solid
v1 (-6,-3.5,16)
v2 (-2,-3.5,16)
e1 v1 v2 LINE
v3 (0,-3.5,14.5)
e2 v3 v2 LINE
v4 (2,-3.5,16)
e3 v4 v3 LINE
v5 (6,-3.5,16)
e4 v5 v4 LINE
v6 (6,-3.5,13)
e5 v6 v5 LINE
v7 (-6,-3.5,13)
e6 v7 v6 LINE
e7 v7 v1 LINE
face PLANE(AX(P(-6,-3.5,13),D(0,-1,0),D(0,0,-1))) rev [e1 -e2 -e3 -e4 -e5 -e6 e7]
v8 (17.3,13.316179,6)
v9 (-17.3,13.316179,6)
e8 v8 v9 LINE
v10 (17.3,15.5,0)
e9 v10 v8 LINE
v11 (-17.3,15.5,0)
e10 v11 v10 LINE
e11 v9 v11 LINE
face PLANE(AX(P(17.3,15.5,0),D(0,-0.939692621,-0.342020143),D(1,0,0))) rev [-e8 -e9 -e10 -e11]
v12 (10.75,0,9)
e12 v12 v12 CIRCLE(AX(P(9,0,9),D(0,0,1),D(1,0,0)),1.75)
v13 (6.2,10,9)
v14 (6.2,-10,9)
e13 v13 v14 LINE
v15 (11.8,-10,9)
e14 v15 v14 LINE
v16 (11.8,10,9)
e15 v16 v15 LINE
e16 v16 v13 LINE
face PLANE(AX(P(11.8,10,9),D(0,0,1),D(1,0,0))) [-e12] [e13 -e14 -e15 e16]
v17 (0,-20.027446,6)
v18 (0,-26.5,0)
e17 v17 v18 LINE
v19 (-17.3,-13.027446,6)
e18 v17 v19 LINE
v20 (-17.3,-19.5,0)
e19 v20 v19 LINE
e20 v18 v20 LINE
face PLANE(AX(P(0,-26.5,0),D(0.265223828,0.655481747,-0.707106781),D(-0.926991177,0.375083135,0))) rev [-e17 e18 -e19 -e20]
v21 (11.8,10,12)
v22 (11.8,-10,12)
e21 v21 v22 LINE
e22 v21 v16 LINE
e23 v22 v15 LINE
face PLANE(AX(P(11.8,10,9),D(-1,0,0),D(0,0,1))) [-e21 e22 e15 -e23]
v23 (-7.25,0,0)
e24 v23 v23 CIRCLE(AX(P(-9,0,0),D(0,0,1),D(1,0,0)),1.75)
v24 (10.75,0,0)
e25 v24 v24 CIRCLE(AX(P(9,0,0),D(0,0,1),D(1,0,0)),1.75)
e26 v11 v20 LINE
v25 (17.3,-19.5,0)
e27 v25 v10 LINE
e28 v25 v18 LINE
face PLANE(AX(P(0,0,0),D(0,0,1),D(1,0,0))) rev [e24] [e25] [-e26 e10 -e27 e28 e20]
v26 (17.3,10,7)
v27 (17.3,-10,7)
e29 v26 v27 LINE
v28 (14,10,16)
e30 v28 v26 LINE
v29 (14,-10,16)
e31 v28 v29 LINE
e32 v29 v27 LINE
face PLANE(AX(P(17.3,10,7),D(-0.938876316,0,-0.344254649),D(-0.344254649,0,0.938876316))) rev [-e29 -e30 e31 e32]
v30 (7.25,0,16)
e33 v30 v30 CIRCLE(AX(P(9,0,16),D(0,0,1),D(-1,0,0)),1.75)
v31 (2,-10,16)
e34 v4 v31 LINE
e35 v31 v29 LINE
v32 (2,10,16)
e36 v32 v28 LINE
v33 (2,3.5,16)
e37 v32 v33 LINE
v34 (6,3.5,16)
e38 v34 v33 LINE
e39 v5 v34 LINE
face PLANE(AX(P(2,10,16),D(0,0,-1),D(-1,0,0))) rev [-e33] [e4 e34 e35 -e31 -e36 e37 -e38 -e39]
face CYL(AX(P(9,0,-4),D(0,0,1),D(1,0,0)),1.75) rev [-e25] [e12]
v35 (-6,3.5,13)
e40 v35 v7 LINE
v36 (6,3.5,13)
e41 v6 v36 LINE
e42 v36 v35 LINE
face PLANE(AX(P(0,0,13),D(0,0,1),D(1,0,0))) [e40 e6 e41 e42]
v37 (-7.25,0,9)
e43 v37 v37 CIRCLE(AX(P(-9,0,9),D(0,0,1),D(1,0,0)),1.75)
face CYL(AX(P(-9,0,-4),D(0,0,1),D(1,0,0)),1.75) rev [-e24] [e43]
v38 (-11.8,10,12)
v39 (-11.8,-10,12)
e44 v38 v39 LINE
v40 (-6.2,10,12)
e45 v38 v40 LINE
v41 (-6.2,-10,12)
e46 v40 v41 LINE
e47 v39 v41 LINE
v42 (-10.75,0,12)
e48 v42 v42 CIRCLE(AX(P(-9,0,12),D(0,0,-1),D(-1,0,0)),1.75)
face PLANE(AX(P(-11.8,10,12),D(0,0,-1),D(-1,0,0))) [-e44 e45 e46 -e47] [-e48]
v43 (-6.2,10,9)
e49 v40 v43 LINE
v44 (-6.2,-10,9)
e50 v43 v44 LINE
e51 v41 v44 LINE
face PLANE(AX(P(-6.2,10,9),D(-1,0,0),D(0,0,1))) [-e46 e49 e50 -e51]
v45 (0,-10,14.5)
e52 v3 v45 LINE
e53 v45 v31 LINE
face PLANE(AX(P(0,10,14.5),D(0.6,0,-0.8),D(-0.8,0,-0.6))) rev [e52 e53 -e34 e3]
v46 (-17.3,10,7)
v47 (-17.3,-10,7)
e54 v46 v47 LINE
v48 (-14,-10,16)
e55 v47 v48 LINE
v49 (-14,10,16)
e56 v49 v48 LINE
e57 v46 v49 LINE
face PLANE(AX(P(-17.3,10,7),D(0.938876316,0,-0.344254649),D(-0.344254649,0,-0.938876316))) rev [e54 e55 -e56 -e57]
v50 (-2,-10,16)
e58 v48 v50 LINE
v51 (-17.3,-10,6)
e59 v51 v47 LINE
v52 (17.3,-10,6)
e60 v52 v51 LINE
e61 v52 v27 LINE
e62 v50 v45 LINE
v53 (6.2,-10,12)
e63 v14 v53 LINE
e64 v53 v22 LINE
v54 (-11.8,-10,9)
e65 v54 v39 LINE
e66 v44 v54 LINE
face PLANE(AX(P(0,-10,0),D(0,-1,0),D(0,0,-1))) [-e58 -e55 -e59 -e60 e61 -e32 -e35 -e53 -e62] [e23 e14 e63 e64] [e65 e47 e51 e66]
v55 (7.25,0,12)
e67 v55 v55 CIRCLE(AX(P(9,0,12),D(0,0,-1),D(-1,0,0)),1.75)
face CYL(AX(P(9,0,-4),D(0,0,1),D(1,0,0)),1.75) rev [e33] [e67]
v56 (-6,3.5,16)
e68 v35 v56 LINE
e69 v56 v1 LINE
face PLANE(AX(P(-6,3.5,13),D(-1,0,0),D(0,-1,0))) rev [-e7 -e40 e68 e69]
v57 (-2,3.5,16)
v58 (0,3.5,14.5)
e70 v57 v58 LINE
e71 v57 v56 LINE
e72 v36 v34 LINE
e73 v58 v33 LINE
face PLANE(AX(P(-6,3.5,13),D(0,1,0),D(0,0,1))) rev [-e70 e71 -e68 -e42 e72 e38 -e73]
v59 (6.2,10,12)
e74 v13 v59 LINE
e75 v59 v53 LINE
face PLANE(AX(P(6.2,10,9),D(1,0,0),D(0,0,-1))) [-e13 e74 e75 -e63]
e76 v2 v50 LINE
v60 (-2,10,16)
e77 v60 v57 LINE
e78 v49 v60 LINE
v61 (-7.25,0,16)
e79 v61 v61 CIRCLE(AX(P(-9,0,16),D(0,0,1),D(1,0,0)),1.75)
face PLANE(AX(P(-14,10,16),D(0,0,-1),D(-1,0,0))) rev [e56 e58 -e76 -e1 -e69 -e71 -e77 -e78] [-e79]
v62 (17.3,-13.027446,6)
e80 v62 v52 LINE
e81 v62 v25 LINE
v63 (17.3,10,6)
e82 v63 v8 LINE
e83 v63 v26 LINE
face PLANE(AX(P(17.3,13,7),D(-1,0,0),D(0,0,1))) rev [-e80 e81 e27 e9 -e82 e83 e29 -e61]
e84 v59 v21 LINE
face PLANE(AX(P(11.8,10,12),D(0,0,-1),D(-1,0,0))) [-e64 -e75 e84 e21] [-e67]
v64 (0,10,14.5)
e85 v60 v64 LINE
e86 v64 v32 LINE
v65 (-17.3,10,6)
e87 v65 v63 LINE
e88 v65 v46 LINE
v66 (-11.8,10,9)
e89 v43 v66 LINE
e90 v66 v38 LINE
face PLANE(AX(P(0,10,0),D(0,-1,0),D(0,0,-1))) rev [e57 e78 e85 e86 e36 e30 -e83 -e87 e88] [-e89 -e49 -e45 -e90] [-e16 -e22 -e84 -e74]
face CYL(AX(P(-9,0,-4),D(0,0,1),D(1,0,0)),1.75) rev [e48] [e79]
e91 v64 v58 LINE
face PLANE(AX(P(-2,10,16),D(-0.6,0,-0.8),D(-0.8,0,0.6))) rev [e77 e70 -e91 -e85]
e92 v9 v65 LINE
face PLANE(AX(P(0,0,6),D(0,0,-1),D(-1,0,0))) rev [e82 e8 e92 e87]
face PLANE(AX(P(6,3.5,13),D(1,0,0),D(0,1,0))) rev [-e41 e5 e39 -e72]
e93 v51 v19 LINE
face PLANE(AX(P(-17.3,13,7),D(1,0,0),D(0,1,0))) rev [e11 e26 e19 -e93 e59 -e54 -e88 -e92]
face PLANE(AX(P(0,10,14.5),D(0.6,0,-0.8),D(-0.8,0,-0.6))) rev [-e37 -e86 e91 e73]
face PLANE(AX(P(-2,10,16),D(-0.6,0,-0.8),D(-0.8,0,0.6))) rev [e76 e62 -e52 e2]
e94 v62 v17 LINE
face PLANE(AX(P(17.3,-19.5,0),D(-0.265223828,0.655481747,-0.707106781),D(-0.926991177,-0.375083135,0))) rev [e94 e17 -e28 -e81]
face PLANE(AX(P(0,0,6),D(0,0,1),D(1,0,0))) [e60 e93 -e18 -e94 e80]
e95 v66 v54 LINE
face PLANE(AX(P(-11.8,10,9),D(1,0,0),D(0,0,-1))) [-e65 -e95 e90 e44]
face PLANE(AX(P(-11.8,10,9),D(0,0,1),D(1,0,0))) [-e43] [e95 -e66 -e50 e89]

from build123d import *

# Parameters (mm, degrees)
ESBO_O1_W                = 34.6
ESBO_O1_H                = 26
RESSALTO_EXTRUS_O1_DEPTH = 7
ESBO_O10_W               = 34.6
ESBO_O10_H               = 2.5
RESSALTO_EXTRUS_O4_DEPTH = 7
CHANFRO1_SIZE            = 7
CHANFRO2_SIZE2           = 7
CHANFRO2_SIZE            = 2.54779164
ESBO_O11_W               = 5.6
ESBO_O11_H               = 3
RESSALTO_EXTRUS_O5_DEPTH = 10
ESBO_O12_R               = 1.75
CORTE_EXTRUS_O1_DEPTH    = 20
ESBO_O13_W               = 34.6
ESBO_O13_H               = 5.5
ESBO_O13_H_2             = 18.393079324
CORTE_EXTRUS_O2_DEPTH    = 1
ESBO_O14_W               = 12
ESBO_O14_H               = 7
CORTE_EXTRUS_O3_DEPTH    = 3


with BuildPart() as part:
    # Esboço1 → Ressalto-extrusão1 (new body)
    with BuildSketch(Plane.XY):
        Rectangle(ESBO_O1_W, ESBO_O1_H)
    extrude(amount=RESSALTO_EXTRUS_O1_DEPTH)

    # Esboço10 → Ressalto-extrusão4 (add)
    with BuildSketch(Plane(origin=(0, 0, 0), x_dir=(-1, 0, 0), z_dir=(0, 0, -1))):
        Polygon((-17.3, -19.5), (0, -26.5), (17.3, -19.5), (17.3, -13), (-17.3, -13), align=None)
        with Locations((0, 14.25)):
            Rectangle(ESBO_O10_W, ESBO_O10_H)
    extrude(amount=-RESSALTO_EXTRUS_O4_DEPTH)

    # Chanfro1
    chanfro1_edges = [part.edges().sort_by_distance(p)[0] for p in [
        (8.65, -23, 7),
        (-8.65, -23, 7),
    ]]
    chamfer(chanfro1_edges, length=CHANFRO1_SIZE - 0.0001)  # a hair under: the kernel refuses the full size

    # Chanfro2
    chanfro2_edges = [part.edges().sort_by_distance(p)[0] for p in [
        (0, 15.5, 7),
    ]]
    chanfro2_side = [part.faces().sort_by_distance(p)[0] for p in [
        (0, 15.449044167, 7),
    ]]
    chamfer(chanfro2_edges, length=CHANFRO2_SIZE - 0.0001, length2=CHANFRO2_SIZE2 - 0.0001, reference=chanfro2_side[0])  # a hair under: the kernel refuses the full size

    # Esboço11 → Ressalto-extrusão5 (add, symmetric)
    with BuildSketch(Plane(origin=(0, 0, 0), x_dir=(1, 0, 0), z_dir=(0, 1, 0))):
        Polygon((-17.3, -7), (-14, -16), (-2, -16), (0, -14.5), (2, -16), (14, -16), (17.3, -7), align=None)
        with Locations((-9, -10.5)):
            Rectangle(ESBO_O11_W, ESBO_O11_H, mode=Mode.SUBTRACT)
        with Locations((9, -10.5)):
            Rectangle(ESBO_O11_W, ESBO_O11_H, mode=Mode.SUBTRACT)
    extrude(amount=RESSALTO_EXTRUS_O5_DEPTH, both=True)

    # Esboço12 → Corte-extrusão1 (cut)
    with BuildSketch(Plane.XY.offset(16)):
        with Locations((-9, 0)):
            Circle(ESBO_O12_R)
        with Locations(Location((9, 0, 0), (0, 0, 180))):
            Circle(ESBO_O12_R)
    extrude(amount=-CORTE_EXTRUS_O1_DEPTH, mode=Mode.SUBTRACT)

    # Esboço13 → Corte-extrusão2 (cut)
    with BuildSketch(Plane.XY.offset(7)):
        with Locations((0, 12.75)):
            Rectangle(ESBO_O13_W, ESBO_O13_H)
        with Locations((0, -19.196539662)):
            Rectangle(ESBO_O13_W, ESBO_O13_H_2)
    extrude(amount=-CORTE_EXTRUS_O2_DEPTH, mode=Mode.SUBTRACT)

    # Esboço14 → Corte-extrusão3 (cut)
    with BuildSketch(Plane.XY.offset(16)):
        Rectangle(ESBO_O14_W, ESBO_O14_H)
    extrude(amount=-CORTE_EXTRUS_O3_DEPTH, mode=Mode.SUBTRACT)


solid = part.part
